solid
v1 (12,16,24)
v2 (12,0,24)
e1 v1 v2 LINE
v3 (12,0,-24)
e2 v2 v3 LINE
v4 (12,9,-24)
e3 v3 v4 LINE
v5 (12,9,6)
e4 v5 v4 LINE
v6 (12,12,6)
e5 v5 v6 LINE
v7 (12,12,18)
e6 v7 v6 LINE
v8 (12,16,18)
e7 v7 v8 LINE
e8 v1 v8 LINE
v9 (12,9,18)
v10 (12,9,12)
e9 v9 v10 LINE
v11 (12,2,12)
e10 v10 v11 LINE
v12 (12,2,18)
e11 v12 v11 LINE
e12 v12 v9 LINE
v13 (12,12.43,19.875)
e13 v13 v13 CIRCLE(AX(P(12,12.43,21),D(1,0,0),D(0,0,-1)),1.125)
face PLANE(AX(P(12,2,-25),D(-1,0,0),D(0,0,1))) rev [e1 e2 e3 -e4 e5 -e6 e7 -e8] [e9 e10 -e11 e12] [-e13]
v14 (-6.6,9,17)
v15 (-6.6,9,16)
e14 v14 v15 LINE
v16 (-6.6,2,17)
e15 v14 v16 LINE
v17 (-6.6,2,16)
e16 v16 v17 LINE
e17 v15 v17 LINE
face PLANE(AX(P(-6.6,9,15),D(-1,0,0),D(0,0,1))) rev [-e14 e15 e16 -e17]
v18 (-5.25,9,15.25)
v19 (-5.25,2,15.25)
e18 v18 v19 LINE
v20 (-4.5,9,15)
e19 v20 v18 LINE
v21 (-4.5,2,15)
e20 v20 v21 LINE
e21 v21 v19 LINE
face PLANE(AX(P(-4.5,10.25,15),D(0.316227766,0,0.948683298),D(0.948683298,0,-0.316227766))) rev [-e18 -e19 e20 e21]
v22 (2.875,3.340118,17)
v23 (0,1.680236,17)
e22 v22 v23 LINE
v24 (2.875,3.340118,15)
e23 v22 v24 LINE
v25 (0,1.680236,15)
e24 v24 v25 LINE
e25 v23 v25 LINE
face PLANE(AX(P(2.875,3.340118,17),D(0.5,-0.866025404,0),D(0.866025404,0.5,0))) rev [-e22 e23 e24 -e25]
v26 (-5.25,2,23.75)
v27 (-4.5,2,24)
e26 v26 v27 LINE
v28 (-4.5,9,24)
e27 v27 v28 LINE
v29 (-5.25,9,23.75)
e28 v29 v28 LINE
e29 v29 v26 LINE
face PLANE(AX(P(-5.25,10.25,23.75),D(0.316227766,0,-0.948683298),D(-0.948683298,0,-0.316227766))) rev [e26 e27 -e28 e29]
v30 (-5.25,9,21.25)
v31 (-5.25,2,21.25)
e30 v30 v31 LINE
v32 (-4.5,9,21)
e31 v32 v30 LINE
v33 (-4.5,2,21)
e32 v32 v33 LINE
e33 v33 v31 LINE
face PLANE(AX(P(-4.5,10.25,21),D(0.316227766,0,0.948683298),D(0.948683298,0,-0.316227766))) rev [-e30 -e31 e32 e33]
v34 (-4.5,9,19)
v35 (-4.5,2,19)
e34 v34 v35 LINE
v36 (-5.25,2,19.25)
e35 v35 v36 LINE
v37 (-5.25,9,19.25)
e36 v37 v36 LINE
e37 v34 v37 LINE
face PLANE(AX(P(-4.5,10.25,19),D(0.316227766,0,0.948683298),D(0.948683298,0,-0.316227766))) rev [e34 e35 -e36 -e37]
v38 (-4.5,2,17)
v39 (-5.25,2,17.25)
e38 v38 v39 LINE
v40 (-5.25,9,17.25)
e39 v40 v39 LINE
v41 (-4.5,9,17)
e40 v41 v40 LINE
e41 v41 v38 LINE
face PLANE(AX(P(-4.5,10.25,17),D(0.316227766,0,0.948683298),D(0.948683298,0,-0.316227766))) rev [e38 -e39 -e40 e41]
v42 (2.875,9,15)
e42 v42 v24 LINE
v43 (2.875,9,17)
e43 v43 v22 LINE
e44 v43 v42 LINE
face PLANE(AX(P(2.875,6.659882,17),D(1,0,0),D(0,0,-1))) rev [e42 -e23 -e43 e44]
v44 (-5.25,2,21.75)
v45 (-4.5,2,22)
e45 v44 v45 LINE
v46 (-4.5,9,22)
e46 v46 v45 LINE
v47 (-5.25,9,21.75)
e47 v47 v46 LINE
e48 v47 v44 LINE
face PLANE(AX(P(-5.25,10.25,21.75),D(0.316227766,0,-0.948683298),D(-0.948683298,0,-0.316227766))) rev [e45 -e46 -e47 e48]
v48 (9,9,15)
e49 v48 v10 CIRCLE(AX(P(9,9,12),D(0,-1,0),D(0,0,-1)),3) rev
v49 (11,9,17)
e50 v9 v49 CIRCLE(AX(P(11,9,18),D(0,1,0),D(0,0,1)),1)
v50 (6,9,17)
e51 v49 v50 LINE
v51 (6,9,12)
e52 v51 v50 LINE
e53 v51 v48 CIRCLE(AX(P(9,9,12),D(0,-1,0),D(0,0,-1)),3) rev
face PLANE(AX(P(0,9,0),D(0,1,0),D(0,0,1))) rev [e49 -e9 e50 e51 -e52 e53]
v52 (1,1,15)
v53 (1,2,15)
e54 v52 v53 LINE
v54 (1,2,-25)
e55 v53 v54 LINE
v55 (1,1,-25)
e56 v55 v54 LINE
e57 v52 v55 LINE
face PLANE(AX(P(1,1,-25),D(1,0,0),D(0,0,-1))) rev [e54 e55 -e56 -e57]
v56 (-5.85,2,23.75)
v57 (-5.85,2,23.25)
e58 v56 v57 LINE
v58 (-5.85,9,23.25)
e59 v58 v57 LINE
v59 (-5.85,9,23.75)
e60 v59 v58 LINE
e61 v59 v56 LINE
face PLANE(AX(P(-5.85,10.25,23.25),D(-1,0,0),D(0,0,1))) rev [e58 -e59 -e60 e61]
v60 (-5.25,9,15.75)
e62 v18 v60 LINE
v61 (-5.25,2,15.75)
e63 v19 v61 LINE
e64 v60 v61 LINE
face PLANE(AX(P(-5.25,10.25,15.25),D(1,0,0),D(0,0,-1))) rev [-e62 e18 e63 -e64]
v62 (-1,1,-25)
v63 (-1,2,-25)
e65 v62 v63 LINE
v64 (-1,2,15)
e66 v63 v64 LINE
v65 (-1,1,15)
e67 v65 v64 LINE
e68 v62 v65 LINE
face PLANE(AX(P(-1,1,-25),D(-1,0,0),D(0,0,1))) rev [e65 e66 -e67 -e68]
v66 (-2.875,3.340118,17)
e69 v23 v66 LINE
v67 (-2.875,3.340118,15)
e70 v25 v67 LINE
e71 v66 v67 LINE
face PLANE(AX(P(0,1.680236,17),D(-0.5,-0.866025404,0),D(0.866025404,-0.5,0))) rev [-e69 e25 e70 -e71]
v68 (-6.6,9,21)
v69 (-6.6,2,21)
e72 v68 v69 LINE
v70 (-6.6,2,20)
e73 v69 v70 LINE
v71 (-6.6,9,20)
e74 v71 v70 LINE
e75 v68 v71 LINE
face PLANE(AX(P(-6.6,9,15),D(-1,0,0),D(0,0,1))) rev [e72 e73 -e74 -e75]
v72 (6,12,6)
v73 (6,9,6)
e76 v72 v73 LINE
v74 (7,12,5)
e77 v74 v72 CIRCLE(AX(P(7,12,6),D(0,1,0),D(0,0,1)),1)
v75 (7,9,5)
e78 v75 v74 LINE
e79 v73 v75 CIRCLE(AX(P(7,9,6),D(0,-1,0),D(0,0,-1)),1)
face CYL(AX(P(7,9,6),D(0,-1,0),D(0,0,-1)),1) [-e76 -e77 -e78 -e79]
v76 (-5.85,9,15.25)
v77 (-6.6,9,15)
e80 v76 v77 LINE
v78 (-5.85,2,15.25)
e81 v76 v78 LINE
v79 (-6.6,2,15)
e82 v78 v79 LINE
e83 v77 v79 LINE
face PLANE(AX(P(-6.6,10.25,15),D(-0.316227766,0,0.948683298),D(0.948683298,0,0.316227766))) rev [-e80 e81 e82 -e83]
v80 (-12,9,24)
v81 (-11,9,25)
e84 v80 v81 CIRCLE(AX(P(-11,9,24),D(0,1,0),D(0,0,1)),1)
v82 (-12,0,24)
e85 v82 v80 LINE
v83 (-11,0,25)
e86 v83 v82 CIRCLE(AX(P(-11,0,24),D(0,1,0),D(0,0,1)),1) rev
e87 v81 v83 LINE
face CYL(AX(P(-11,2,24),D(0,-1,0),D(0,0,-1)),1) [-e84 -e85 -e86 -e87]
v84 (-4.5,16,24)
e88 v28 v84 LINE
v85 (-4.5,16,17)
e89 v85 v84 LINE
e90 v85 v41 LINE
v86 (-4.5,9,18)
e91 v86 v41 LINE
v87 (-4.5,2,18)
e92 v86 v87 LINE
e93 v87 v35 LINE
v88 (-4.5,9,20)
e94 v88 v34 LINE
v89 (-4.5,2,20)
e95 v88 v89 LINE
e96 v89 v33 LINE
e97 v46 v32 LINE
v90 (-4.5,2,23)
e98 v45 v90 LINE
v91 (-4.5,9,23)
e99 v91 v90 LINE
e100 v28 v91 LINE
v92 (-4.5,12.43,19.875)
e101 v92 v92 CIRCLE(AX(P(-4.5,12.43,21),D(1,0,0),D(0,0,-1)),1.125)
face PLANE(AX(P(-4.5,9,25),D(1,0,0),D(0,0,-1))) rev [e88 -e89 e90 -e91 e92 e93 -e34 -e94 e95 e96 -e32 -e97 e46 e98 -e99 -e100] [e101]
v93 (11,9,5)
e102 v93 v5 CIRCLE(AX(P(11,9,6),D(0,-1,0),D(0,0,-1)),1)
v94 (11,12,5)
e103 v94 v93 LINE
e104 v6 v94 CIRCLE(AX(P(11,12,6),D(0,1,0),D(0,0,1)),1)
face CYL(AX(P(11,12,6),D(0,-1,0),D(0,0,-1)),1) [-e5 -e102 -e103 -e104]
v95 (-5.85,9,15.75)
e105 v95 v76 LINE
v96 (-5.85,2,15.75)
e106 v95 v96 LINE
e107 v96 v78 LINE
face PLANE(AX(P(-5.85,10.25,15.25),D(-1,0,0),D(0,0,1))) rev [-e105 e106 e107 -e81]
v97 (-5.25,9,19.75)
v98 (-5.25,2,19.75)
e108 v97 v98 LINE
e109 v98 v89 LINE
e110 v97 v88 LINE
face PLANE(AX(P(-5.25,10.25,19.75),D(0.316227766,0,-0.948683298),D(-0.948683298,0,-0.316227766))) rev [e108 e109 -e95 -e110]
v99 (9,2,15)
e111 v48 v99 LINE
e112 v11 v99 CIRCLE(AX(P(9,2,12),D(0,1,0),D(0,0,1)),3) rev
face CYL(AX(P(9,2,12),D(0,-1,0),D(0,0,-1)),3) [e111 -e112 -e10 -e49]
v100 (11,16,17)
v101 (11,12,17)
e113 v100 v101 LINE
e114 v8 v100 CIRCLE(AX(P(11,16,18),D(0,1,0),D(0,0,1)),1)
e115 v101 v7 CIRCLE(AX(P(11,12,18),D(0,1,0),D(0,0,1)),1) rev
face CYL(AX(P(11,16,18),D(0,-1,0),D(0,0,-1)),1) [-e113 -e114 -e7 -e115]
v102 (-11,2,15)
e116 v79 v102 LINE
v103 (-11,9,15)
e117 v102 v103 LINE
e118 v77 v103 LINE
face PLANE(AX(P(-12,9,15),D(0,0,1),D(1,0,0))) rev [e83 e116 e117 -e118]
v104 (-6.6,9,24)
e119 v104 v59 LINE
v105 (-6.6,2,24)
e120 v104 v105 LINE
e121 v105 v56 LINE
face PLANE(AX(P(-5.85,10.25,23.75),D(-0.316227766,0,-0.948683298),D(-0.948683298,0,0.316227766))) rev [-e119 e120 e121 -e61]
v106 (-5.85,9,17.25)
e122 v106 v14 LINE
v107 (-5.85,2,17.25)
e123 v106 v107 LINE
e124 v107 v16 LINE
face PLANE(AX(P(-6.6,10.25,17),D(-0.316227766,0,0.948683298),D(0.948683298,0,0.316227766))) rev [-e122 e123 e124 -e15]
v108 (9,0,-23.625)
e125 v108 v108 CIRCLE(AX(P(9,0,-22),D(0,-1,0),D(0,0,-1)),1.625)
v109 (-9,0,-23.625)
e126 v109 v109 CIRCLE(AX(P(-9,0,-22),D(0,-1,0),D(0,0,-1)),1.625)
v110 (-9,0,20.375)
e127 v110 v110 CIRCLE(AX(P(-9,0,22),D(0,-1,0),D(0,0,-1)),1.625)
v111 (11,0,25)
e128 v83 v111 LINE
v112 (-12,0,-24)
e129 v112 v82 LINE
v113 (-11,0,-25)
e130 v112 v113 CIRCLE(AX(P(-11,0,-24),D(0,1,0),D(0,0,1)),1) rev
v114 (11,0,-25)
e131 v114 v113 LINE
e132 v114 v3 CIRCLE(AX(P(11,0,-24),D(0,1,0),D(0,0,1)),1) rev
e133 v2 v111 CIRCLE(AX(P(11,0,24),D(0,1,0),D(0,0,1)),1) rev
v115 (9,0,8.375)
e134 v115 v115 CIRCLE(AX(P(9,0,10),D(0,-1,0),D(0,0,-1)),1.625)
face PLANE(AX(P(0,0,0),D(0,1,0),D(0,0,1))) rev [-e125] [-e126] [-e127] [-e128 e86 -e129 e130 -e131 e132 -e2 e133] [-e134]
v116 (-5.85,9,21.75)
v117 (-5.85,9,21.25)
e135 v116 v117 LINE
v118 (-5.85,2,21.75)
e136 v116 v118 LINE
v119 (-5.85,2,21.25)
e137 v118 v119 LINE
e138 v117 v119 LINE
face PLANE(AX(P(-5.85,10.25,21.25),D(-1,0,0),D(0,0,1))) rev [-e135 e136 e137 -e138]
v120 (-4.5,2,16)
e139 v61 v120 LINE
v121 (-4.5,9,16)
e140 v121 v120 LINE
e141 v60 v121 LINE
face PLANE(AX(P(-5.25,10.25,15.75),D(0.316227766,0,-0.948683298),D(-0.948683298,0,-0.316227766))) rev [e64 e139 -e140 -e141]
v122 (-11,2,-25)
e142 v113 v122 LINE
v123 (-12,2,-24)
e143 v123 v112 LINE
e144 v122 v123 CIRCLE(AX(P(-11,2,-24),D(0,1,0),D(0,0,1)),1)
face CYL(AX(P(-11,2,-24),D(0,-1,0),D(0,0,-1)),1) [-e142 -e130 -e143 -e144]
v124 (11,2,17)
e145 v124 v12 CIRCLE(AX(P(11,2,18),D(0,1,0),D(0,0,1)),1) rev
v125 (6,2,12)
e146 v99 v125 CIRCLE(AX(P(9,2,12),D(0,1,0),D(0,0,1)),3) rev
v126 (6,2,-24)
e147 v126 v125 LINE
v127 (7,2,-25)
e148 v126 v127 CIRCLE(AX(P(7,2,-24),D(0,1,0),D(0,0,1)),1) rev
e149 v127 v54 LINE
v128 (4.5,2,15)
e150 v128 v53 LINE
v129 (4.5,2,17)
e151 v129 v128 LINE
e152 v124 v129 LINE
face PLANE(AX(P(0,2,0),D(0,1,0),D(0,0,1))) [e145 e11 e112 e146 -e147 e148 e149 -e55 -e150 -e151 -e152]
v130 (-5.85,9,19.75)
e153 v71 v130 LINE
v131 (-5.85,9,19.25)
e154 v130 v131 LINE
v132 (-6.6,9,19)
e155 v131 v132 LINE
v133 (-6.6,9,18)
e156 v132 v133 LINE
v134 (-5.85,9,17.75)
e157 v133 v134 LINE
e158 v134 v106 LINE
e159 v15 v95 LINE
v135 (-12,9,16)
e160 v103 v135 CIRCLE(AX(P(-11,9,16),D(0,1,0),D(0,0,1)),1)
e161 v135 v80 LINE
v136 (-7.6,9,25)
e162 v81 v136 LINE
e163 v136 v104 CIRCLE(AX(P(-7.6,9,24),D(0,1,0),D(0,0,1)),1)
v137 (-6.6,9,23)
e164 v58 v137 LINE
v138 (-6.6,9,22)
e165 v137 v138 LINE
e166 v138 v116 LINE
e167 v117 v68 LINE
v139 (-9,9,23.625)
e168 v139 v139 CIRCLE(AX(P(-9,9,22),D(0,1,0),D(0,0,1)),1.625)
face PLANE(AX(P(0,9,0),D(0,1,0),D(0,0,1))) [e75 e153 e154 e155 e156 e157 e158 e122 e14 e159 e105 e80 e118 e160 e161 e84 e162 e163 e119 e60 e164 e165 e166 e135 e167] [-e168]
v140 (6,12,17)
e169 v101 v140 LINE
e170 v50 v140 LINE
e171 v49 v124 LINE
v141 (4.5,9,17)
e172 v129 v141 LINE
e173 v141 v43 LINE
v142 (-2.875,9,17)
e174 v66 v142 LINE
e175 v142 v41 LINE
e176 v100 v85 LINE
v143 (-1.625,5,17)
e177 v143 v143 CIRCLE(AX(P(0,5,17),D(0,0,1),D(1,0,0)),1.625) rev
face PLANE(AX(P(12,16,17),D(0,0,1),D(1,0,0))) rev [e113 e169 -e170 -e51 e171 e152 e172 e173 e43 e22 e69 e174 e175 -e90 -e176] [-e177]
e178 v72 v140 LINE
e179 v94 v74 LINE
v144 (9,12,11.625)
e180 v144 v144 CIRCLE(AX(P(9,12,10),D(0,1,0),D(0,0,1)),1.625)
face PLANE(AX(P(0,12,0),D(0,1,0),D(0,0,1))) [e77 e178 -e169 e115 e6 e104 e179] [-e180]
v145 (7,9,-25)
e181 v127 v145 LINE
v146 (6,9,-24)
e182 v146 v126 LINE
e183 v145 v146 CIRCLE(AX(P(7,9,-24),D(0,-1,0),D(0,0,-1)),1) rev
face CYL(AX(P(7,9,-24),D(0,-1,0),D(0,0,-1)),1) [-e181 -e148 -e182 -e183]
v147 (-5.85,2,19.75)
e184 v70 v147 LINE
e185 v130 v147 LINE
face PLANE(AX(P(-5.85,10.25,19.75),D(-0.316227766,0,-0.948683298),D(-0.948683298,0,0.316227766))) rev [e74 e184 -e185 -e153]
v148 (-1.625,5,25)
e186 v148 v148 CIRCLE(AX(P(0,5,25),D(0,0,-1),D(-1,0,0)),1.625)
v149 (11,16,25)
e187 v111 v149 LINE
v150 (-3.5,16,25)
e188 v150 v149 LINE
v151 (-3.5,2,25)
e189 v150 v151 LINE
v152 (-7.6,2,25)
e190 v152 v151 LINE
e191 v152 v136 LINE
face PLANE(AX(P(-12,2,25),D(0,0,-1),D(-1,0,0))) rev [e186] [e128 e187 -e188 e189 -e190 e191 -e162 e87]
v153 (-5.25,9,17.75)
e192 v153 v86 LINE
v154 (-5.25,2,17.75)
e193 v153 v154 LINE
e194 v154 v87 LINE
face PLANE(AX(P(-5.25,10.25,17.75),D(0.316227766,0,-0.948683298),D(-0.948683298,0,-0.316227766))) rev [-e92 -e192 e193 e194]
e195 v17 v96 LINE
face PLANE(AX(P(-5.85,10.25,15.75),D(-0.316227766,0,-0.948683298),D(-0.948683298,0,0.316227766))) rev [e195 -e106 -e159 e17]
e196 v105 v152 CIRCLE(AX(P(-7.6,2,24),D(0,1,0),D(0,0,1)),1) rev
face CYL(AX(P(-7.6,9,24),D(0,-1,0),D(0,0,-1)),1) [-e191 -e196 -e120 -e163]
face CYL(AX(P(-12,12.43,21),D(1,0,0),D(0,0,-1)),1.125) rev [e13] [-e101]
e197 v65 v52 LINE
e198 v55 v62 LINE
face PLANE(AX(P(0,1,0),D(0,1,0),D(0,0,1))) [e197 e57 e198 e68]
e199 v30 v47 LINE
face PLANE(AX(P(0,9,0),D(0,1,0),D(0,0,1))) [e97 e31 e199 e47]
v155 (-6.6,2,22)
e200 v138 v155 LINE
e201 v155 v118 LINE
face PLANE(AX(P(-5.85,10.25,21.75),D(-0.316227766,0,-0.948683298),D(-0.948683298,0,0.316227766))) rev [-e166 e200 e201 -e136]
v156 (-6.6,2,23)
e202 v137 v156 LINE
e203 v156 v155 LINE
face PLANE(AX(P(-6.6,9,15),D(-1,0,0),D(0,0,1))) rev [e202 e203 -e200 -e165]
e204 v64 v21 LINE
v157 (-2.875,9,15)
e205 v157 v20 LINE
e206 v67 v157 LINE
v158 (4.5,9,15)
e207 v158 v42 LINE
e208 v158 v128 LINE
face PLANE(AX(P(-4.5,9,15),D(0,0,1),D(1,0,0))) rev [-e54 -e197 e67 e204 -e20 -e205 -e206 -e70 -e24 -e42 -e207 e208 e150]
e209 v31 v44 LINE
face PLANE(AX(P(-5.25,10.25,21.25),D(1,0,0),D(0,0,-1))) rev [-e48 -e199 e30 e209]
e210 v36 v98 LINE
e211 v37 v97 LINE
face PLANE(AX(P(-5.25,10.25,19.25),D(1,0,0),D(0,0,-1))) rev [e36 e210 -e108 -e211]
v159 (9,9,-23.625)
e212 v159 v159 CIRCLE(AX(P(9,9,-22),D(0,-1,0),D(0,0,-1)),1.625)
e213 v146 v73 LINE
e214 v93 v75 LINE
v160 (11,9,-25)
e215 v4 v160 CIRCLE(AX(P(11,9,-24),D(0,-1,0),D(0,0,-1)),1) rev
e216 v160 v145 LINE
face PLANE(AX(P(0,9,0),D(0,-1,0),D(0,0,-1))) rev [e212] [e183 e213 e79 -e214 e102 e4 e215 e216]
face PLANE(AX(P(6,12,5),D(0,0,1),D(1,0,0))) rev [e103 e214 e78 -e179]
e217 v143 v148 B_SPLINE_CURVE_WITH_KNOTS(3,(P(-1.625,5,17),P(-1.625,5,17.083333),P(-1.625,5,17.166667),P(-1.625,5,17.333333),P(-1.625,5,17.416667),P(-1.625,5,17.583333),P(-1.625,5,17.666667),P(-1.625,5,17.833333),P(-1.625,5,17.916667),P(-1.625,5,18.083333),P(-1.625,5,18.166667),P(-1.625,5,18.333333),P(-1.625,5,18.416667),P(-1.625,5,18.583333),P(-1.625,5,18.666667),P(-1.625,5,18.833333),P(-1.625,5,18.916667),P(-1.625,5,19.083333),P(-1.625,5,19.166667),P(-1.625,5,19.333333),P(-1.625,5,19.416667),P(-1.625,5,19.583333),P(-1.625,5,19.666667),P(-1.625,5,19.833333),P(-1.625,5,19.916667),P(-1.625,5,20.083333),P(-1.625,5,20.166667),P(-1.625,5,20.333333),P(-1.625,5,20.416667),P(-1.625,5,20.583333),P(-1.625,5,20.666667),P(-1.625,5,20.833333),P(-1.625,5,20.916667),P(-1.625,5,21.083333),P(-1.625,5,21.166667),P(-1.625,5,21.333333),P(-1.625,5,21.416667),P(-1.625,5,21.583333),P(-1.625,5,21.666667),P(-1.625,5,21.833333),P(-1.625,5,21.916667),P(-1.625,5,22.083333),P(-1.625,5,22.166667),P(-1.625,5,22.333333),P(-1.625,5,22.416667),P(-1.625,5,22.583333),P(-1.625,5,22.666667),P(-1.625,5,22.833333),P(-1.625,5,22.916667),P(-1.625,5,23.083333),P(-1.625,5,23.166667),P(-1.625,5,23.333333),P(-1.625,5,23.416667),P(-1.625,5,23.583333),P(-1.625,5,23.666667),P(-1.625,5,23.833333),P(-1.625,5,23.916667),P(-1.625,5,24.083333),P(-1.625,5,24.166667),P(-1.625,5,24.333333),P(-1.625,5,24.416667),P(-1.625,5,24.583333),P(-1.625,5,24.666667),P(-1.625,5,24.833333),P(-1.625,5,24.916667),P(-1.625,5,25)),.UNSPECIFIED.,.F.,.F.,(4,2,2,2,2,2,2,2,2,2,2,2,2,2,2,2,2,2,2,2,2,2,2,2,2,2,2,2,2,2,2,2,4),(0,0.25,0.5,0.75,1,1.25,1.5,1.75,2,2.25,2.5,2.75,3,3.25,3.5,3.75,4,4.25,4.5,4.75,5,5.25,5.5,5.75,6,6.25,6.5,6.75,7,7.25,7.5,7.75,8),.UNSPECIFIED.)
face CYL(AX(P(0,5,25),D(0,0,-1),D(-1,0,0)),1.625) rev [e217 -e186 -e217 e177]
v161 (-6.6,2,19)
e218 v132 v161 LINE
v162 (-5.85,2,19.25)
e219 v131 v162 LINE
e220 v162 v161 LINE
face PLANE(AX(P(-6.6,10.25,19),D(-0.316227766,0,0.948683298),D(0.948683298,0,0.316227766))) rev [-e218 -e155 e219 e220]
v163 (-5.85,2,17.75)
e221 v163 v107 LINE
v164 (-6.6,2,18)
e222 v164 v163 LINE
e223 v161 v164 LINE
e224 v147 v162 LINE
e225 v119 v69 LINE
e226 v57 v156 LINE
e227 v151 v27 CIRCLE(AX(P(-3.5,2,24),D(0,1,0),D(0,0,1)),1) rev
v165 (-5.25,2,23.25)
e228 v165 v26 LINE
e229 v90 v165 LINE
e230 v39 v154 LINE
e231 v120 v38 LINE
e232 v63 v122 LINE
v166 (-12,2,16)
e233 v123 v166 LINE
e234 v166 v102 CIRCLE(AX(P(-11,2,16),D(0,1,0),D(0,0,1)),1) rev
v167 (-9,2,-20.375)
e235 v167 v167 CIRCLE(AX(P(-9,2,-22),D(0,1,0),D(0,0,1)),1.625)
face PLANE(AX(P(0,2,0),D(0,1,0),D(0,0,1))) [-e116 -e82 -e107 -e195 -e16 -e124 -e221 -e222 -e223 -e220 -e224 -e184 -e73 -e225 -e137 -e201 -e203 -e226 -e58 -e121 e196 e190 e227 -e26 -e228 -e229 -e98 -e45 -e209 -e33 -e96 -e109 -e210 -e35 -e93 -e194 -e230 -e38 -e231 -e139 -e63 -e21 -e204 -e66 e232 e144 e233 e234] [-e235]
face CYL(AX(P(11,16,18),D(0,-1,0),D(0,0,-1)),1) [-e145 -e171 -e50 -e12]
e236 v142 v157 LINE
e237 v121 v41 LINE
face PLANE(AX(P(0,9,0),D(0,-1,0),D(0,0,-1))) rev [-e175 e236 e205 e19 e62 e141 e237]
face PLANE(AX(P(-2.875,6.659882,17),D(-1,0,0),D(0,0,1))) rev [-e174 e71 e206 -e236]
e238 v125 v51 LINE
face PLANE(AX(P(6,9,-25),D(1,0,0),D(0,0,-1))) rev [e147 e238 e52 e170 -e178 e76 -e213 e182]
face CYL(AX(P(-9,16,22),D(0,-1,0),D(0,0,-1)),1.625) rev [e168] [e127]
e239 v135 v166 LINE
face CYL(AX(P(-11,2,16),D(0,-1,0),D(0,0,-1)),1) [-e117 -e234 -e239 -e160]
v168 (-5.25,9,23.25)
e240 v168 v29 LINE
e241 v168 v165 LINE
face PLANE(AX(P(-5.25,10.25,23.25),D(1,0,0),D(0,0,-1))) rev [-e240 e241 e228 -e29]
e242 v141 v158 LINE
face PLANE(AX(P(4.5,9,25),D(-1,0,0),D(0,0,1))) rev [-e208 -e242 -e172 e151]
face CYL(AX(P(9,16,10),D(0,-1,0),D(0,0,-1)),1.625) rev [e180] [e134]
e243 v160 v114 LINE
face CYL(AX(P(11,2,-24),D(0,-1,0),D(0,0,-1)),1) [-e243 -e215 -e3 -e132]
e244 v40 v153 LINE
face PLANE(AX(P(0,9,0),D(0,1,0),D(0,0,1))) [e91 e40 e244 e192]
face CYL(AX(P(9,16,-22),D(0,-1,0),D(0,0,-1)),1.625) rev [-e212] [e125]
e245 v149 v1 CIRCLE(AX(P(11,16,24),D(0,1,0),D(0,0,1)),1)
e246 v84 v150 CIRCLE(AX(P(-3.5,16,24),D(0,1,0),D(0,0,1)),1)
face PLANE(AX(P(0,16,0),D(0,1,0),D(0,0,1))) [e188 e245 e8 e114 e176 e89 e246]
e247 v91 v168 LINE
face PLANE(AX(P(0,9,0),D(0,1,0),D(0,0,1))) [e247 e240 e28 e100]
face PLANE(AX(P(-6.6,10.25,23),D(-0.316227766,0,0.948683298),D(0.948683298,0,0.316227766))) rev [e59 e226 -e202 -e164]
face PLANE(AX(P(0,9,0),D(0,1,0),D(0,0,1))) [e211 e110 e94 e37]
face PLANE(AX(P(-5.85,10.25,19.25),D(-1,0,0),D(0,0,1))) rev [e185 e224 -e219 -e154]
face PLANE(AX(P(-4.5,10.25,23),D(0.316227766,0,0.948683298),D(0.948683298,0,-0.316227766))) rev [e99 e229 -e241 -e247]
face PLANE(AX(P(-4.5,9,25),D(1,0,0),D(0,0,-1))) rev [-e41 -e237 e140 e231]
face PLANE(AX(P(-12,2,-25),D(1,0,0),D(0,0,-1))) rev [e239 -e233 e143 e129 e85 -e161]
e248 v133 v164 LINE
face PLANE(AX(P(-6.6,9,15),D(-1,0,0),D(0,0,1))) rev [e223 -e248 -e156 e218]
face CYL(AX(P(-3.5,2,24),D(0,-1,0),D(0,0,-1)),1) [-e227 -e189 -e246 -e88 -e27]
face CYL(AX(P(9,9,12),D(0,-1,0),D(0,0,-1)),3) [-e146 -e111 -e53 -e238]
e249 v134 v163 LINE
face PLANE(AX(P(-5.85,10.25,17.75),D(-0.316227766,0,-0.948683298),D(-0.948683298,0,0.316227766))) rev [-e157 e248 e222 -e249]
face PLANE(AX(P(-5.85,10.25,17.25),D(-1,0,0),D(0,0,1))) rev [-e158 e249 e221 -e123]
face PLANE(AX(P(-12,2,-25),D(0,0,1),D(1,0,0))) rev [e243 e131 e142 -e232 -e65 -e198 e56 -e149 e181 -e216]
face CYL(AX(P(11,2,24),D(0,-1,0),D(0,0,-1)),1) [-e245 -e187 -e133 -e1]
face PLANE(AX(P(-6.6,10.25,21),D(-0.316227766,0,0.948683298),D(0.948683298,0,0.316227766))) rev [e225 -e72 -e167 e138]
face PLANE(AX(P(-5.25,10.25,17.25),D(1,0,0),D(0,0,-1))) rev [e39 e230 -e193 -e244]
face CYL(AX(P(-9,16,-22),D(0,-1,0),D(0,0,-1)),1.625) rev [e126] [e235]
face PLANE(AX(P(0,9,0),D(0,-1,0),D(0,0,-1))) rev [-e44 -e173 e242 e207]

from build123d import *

# Parameters (mm, degrees)
SKETCH1_W           = 24
SKETCH1_H           = 50
BOSS_EXTRUDE1_DEPTH = 2
SKETCH2_W           = 6
SKETCH2_H           = 40
SKETCH2_W_2         = 9
SKETCH2_H_2         = 10
SKETCH2_W_3         = 5.4
BOSS_EXTRUDE2_DEPTH = 7
FILLET1_R           = 3
SKETCH3_W           = 16.5
SKETCH3_H           = 8
BOSS_EXTRUDE3_DEPTH = 14
SKETCH4_R           = 1.625
CUT_EXTRUDE1_DEPTH  = 45.72135955
CUT_EXTRUDE2_DEPTH  = 2
SKETCH9_W           = 6
SKETCH9_H           = 20
BOSS_EXTRUDE4_DEPTH = 3
SKETCH6_R           = 1.125
CUT_EXTRUDE3_DEPTH  = 39.170669368
SKETCH7_W           = 2
SKETCH7_H           = 40
CUT_EXTRUDE4_DEPTH  = 1
SKETCH8_R           = 1.625
CUT_EXTRUDE5_DEPTH  = 33.015621187
FILLET2_R           = 1
BOSS_EXTRUDE5_DEPTH = 7
LPATTERN1_COUNT     = 5
LPATTERN1_PITCH     = 2


with BuildPart() as part:
    # Sketch1 → Boss-Extrude1 (new body)
    with BuildSketch(Plane(origin=(0, 0, 0), x_dir=(1, 0, 0), z_dir=(0, 1, 0))):
        Rectangle(SKETCH1_W, SKETCH1_H)
    extrude(amount=BOSS_EXTRUDE1_DEPTH)

    # Sketch2 → Boss-Extrude2 (add)
    with BuildSketch(Plane(origin=(0, 2, 0), x_dir=(1, 0, 0), z_dir=(0, 1, 0))):
        with Locations((9, 5)):
            Rectangle(SKETCH2_W, SKETCH2_H)
        with Locations((0, -20)):
            Rectangle(SKETCH2_W_2, SKETCH2_H_2)
        with Locations((-9.3, -20)):
            Rectangle(SKETCH2_W_3, SKETCH2_H_2)
    extrude(amount=BOSS_EXTRUDE2_DEPTH)

    # Fillet1
    fillet1_edges = [part.edges().sort_by_distance(p)[0] for p in [
        (12, 5.5, 15),
        (6, 5.5, 15),
    ]]
    fillet(fillet1_edges, radius=FILLET1_R - 0.0001)  # a hair under: the kernel refuses the full size

    # Sketch3 → Boss-Extrude3 (add)
    with BuildSketch(Plane(origin=(0, 2, 0), x_dir=(1, 0, 0), z_dir=(0, 1, 0))):
        with Locations((3.75, -21)):
            Rectangle(SKETCH3_W, SKETCH3_H)
    extrude(amount=BOSS_EXTRUDE3_DEPTH)

    # Sketch4 → Cut-Extrude1 (cut, through all)
    with BuildSketch(Plane(origin=(0, 0, 15), x_dir=(-1, 0, 0), z_dir=(0, 0, -1))):
        with Locations((0, 5)):
            Circle(SKETCH4_R)
    extrude(amount=-CUT_EXTRUDE1_DEPTH, mode=Mode.SUBTRACT)

    # Sketch5 → Cut-Extrude2 (cut)
    with BuildSketch(Plane(origin=(0, 0, 15), x_dir=(-1, 0, 0), z_dir=(0, 0, -1))):
        Polygon((-2.875, 6.659882024), (-2.875, 9), (2.875, 9), (2.875, 6.659882024), (2.875, 3.340117976), (0, 1.680235952), (-2.875, 3.340117976), align=None)
    extrude(amount=-CUT_EXTRUDE2_DEPTH, mode=Mode.SUBTRACT)

    # Sketch9 → Boss-Extrude4 (add)
    with BuildSketch(Plane(origin=(0, 9, 0), x_dir=(1, 0, 0), z_dir=(0, 1, 0))):
        with Locations((9, -15)):
            Rectangle(SKETCH9_W, SKETCH9_H)
    extrude(amount=BOSS_EXTRUDE4_DEPTH)

    # Sketch6 → Cut-Extrude3 (cut, through all)
    with BuildSketch(Plane(origin=(12, 0, 0), x_dir=(0, 0, -1), z_dir=(1, 0, 0))):
        with Locations((-21, 12.43)):
            Circle(SKETCH6_R)
    extrude(amount=-CUT_EXTRUDE3_DEPTH, mode=Mode.SUBTRACT)

    # Sketch7 → Cut-Extrude4 (cut)
    with BuildSketch(Plane(origin=(0, 2, 0), x_dir=(1, 0, 0), z_dir=(0, 1, 0))):
        with Locations((0, 5)):
            Rectangle(SKETCH7_W, SKETCH7_H)
    extrude(amount=-CUT_EXTRUDE4_DEPTH, mode=Mode.SUBTRACT)

    # Sketch8 → Cut-Extrude5 (cut, through all)
    with BuildSketch(Plane.XZ):
        with Locations(Location((-9, 22, 0), (0, 0, 270))):
            Circle(SKETCH8_R)
        with Locations(Location((9, 10, 0), (0, 0, 270))):
            Circle(SKETCH8_R)
        with Locations(Location((9, -22, 0), (0, 0, 270))):
            Circle(SKETCH8_R)
        with Locations(Location((-9, -22, 0), (0, 0, 270))):
            Circle(SKETCH8_R)
    extrude(amount=-CUT_EXTRUDE5_DEPTH, mode=Mode.SUBTRACT)

    # Fillet2
    fillet2_edges = [part.edges().sort_by_distance(p)[0] for p in [
        (12, 5.5, 17),
        (6, 10.5, 5),
        (12, 10.5, 5),
        (6, 5.5, -25),
        (-4.5, 9, 25),
        (-12, 5.5, 15),
        (-6.6, 5.5, 25),
        (12, 14, 17),
        (-12, 1, -25),
        (12, 4.5, -25),
        (12, 8, 25),
        (-12, 4.5, 25),
    ]]
    fillet(fillet2_edges, radius=FILLET2_R)

    # Sketch10 → Boss-Extrude5 (add)
    with BuildSketch(Plane(origin=(0, 2, 0), x_dir=(1, 0, 0), z_dir=(0, 1, 0))):
        Polygon((-6.6, -24), (-6.6, -23), (-5.85, -23.25), (-5.85, -23.75), align=None)
        Polygon((-5.25, -23.75), (-4.5, -24), (-4.5, -23), (-5.25, -23.25), align=None)
    boss_extrude5 = extrude(amount=BOSS_EXTRUDE5_DEPTH)

    # LPattern1: Boss-Extrude5 ×5
    with Locations(*[(0, 0, -i * LPATTERN1_PITCH) for i in range(1, LPATTERN1_COUNT)]):
        add(boss_extrude5)


solid = part.part
